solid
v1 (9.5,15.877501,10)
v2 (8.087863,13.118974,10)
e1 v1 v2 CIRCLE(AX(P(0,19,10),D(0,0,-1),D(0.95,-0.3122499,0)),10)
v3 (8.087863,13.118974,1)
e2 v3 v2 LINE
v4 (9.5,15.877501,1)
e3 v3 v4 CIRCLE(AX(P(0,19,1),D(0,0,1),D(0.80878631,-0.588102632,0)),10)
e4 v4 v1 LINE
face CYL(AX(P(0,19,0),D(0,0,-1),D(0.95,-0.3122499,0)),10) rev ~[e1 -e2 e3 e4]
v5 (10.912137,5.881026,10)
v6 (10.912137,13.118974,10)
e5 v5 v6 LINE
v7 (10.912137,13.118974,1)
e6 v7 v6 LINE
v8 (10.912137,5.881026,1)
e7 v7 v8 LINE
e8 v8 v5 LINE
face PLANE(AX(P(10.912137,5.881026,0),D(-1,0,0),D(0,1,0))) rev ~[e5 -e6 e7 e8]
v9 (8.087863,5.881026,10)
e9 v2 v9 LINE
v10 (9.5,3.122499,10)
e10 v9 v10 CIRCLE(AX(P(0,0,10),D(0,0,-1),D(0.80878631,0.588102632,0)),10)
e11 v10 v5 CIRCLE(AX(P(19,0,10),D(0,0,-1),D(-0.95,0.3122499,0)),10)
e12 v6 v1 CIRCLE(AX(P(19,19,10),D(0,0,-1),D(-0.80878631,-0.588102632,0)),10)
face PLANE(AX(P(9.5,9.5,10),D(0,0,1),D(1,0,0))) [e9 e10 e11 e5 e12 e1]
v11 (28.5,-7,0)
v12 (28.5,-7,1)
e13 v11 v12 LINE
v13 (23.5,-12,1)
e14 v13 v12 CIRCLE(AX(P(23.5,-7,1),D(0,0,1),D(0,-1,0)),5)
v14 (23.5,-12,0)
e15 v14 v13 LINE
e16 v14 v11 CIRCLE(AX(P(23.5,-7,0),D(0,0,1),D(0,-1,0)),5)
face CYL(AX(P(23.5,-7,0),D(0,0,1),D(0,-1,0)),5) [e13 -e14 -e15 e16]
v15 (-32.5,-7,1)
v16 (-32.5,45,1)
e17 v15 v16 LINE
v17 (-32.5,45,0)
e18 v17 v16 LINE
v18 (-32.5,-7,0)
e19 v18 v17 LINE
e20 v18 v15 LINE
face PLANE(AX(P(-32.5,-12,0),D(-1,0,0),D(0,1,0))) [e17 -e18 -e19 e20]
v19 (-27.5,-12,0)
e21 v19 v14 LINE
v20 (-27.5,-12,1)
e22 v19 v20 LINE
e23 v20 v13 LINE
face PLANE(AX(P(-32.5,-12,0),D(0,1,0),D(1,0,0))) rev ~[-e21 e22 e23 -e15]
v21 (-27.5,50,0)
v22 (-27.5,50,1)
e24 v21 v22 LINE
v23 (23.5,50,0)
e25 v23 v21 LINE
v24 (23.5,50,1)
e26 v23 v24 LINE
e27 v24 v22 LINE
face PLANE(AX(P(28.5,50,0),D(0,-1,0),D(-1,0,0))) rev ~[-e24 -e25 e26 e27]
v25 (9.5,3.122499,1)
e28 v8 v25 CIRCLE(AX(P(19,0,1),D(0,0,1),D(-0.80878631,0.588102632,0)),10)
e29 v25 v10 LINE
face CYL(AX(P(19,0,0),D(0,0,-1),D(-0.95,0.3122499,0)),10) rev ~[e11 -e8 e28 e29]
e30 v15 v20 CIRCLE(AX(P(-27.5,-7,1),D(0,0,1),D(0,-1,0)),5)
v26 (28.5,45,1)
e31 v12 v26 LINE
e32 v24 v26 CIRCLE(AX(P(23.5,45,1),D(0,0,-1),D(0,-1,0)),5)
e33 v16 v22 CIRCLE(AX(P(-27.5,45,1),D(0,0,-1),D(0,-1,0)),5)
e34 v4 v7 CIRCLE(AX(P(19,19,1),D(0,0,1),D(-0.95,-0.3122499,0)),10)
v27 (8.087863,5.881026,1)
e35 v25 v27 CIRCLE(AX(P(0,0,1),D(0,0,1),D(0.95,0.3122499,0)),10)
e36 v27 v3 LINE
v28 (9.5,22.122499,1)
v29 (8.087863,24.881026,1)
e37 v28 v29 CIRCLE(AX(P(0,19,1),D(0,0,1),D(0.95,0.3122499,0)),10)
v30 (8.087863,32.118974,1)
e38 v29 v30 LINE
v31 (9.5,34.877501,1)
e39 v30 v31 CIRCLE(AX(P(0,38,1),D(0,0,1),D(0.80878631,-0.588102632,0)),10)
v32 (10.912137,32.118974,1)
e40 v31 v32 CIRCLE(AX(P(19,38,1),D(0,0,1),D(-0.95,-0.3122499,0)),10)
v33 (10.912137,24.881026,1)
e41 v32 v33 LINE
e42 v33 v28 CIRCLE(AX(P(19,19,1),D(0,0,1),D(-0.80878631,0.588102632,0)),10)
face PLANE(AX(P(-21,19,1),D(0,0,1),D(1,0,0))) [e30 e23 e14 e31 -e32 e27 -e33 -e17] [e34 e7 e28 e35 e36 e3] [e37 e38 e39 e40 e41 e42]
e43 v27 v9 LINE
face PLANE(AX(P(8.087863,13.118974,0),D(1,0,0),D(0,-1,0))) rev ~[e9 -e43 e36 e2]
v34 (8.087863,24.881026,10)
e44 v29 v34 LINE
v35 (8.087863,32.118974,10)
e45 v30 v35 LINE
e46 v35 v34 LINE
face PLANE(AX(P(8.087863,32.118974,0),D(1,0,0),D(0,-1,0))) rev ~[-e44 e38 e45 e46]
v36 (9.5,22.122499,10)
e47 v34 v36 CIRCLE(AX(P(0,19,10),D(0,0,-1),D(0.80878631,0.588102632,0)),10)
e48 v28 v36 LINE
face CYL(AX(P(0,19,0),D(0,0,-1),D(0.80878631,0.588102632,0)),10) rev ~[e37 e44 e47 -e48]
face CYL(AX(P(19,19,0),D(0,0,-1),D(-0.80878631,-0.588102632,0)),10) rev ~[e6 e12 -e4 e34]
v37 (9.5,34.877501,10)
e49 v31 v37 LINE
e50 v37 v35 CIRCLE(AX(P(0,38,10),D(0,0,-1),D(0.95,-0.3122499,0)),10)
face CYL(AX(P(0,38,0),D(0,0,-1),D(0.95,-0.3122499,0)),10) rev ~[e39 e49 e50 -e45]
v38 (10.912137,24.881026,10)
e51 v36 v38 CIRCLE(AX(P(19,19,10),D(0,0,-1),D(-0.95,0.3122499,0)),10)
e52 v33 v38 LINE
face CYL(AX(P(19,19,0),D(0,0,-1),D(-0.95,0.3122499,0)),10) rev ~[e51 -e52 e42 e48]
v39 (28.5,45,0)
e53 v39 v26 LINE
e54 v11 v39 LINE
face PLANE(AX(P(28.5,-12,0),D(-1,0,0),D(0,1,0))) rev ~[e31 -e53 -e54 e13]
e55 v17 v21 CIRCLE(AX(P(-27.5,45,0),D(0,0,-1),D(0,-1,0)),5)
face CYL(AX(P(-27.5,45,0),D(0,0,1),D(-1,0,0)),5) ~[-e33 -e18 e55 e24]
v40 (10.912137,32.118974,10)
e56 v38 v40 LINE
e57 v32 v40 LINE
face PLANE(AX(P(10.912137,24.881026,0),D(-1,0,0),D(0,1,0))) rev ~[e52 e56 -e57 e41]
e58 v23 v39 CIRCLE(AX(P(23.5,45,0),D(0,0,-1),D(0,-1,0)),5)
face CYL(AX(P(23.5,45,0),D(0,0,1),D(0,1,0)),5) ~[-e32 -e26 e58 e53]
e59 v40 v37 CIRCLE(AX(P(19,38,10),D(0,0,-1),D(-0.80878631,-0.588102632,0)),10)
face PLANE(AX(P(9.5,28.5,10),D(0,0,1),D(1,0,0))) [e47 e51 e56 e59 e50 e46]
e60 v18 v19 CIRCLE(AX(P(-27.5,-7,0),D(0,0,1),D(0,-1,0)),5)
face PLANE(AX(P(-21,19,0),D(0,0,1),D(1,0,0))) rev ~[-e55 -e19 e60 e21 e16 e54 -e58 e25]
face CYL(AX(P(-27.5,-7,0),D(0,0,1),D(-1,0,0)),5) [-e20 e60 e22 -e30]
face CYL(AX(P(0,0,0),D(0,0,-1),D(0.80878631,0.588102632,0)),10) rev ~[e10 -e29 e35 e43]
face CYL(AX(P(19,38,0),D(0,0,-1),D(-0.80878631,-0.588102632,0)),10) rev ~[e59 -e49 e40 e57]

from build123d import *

# Parameters (mm, degrees)
F0_W     = 23
F0_H     = 62
F0_W_2   = 38
F1_DEPTH = 1
F2_DEPTH = 10
F3_R     = 5


# Not quite as in the source:
# - a feature names something its author has since deleted; it is built from what else it names


with BuildPart() as f1:
    # F0 (on Top) → F1 (new body)
    with BuildSketch(Plane.XY):
        with Locations((-21, 19)):
            Rectangle(F0_W, F0_H)
        with Locations((9.5, 19)):
            Rectangle(F0_W_2, F0_H)
        with BuildLine():
            ThreePointArc((9.5, 15.8775010008), (10.0985618966, 14.4432029131), (10.9121369044, 13.1189736826))
            Line((10.9121369044, 13.1189736826), (10.9121369044, 5.8810263174))
            ThreePointArc((10.9121369044, 5.8810263174), (10.0985618966, 4.5567970869), (9.5, 3.1224989992))
            ThreePointArc((9.5, 3.1224989992), (8.9014381034, 4.5567970869), (8.0878630956, 5.8810263174))
            Line((8.0878630956, 5.8810263174), (8.0878630956, 13.1189736826))
            ThreePointArc((8.0878630956, 13.1189736826), (8.9014381034, 14.4432029131), (9.5, 15.8775010008))
        make_face(mode=Mode.SUBTRACT)
        with BuildLine():
            Line((8.0878630956, 24.8810263174), (8.0878630956, 32.1189736826))
            ThreePointArc((8.0878630956, 32.1189736826), (8.9014381034, 33.4432029131), (9.5, 34.8775010008))
            ThreePointArc((9.5, 34.8775010008), (10.0985618966, 33.4432029131), (10.9121369044, 32.1189736826))
            Line((10.9121369044, 32.1189736826), (10.9121369044, 24.8810263174))
            ThreePointArc((10.9121369044, 24.8810263174), (10.0985618966, 23.5567970869), (9.5, 22.1224989992))
            ThreePointArc((9.5, 22.1224989992), (8.9014381034, 23.5567970869), (8.0878630956, 24.8810263174))
        make_face(mode=Mode.SUBTRACT)
    extrude(amount=F1_DEPTH)

    # F0 (on Top) → F2 (join)
    with BuildSketch(Plane.XY):
        with BuildLine():
            ThreePointArc((9.5, 34.8775010008), (8.9014381034, 33.4432029131), (8.0878630956, 32.1189736826))
            Line((8.0878630956, 32.1189736826), (8.0878630956, 24.8810263174))
            ThreePointArc((8.0878630956, 24.8810263174), (8.9014381034, 23.5567970869), (9.5, 22.1224989992))
            ThreePointArc((9.5, 22.1224989992), (10.0985618966, 23.5567970869), (10.9121369044, 24.8810263174))
            Line((10.9121369044, 24.8810263174), (10.9121369044, 32.1189736826))
            ThreePointArc((10.9121369044, 32.1189736826), (10.0985618966, 33.4432029131), (9.5, 34.8775010008))
        make_face()
        with BuildLine():
            Line((10.9121369044, 5.8810263174), (10.9121369044, 13.1189736826))
            ThreePointArc((10.9121369044, 13.1189736826), (10.0985618966, 14.4432029131), (9.5, 15.8775010008))
            ThreePointArc((9.5, 15.8775010008), (8.9014381034, 14.4432029131), (8.0878630956, 13.1189736826))
            Line((8.0878630956, 13.1189736826), (8.0878630956, 5.8810263174))
            ThreePointArc((8.0878630956, 5.8810263174), (8.9014381034, 4.5567970869), (9.5, 3.1224989992))
            ThreePointArc((9.5, 3.1224989992), (10.0985618966, 4.5567970869), (10.9121369044, 5.8810263174))
        make_face()
    extrude(amount=F2_DEPTH)

    # F3
    f3_edges = [f1.edges().sort_by_distance(p)[0] for p in [
        (-32.5, 50, 0.5),
        (28.5, 50, 0.5),
        (28.5, -12, 0.5),
        (-32.5, -12, 0.5),
    ]]
    fillet(f3_edges, radius=F3_R)


solid = f1.part
